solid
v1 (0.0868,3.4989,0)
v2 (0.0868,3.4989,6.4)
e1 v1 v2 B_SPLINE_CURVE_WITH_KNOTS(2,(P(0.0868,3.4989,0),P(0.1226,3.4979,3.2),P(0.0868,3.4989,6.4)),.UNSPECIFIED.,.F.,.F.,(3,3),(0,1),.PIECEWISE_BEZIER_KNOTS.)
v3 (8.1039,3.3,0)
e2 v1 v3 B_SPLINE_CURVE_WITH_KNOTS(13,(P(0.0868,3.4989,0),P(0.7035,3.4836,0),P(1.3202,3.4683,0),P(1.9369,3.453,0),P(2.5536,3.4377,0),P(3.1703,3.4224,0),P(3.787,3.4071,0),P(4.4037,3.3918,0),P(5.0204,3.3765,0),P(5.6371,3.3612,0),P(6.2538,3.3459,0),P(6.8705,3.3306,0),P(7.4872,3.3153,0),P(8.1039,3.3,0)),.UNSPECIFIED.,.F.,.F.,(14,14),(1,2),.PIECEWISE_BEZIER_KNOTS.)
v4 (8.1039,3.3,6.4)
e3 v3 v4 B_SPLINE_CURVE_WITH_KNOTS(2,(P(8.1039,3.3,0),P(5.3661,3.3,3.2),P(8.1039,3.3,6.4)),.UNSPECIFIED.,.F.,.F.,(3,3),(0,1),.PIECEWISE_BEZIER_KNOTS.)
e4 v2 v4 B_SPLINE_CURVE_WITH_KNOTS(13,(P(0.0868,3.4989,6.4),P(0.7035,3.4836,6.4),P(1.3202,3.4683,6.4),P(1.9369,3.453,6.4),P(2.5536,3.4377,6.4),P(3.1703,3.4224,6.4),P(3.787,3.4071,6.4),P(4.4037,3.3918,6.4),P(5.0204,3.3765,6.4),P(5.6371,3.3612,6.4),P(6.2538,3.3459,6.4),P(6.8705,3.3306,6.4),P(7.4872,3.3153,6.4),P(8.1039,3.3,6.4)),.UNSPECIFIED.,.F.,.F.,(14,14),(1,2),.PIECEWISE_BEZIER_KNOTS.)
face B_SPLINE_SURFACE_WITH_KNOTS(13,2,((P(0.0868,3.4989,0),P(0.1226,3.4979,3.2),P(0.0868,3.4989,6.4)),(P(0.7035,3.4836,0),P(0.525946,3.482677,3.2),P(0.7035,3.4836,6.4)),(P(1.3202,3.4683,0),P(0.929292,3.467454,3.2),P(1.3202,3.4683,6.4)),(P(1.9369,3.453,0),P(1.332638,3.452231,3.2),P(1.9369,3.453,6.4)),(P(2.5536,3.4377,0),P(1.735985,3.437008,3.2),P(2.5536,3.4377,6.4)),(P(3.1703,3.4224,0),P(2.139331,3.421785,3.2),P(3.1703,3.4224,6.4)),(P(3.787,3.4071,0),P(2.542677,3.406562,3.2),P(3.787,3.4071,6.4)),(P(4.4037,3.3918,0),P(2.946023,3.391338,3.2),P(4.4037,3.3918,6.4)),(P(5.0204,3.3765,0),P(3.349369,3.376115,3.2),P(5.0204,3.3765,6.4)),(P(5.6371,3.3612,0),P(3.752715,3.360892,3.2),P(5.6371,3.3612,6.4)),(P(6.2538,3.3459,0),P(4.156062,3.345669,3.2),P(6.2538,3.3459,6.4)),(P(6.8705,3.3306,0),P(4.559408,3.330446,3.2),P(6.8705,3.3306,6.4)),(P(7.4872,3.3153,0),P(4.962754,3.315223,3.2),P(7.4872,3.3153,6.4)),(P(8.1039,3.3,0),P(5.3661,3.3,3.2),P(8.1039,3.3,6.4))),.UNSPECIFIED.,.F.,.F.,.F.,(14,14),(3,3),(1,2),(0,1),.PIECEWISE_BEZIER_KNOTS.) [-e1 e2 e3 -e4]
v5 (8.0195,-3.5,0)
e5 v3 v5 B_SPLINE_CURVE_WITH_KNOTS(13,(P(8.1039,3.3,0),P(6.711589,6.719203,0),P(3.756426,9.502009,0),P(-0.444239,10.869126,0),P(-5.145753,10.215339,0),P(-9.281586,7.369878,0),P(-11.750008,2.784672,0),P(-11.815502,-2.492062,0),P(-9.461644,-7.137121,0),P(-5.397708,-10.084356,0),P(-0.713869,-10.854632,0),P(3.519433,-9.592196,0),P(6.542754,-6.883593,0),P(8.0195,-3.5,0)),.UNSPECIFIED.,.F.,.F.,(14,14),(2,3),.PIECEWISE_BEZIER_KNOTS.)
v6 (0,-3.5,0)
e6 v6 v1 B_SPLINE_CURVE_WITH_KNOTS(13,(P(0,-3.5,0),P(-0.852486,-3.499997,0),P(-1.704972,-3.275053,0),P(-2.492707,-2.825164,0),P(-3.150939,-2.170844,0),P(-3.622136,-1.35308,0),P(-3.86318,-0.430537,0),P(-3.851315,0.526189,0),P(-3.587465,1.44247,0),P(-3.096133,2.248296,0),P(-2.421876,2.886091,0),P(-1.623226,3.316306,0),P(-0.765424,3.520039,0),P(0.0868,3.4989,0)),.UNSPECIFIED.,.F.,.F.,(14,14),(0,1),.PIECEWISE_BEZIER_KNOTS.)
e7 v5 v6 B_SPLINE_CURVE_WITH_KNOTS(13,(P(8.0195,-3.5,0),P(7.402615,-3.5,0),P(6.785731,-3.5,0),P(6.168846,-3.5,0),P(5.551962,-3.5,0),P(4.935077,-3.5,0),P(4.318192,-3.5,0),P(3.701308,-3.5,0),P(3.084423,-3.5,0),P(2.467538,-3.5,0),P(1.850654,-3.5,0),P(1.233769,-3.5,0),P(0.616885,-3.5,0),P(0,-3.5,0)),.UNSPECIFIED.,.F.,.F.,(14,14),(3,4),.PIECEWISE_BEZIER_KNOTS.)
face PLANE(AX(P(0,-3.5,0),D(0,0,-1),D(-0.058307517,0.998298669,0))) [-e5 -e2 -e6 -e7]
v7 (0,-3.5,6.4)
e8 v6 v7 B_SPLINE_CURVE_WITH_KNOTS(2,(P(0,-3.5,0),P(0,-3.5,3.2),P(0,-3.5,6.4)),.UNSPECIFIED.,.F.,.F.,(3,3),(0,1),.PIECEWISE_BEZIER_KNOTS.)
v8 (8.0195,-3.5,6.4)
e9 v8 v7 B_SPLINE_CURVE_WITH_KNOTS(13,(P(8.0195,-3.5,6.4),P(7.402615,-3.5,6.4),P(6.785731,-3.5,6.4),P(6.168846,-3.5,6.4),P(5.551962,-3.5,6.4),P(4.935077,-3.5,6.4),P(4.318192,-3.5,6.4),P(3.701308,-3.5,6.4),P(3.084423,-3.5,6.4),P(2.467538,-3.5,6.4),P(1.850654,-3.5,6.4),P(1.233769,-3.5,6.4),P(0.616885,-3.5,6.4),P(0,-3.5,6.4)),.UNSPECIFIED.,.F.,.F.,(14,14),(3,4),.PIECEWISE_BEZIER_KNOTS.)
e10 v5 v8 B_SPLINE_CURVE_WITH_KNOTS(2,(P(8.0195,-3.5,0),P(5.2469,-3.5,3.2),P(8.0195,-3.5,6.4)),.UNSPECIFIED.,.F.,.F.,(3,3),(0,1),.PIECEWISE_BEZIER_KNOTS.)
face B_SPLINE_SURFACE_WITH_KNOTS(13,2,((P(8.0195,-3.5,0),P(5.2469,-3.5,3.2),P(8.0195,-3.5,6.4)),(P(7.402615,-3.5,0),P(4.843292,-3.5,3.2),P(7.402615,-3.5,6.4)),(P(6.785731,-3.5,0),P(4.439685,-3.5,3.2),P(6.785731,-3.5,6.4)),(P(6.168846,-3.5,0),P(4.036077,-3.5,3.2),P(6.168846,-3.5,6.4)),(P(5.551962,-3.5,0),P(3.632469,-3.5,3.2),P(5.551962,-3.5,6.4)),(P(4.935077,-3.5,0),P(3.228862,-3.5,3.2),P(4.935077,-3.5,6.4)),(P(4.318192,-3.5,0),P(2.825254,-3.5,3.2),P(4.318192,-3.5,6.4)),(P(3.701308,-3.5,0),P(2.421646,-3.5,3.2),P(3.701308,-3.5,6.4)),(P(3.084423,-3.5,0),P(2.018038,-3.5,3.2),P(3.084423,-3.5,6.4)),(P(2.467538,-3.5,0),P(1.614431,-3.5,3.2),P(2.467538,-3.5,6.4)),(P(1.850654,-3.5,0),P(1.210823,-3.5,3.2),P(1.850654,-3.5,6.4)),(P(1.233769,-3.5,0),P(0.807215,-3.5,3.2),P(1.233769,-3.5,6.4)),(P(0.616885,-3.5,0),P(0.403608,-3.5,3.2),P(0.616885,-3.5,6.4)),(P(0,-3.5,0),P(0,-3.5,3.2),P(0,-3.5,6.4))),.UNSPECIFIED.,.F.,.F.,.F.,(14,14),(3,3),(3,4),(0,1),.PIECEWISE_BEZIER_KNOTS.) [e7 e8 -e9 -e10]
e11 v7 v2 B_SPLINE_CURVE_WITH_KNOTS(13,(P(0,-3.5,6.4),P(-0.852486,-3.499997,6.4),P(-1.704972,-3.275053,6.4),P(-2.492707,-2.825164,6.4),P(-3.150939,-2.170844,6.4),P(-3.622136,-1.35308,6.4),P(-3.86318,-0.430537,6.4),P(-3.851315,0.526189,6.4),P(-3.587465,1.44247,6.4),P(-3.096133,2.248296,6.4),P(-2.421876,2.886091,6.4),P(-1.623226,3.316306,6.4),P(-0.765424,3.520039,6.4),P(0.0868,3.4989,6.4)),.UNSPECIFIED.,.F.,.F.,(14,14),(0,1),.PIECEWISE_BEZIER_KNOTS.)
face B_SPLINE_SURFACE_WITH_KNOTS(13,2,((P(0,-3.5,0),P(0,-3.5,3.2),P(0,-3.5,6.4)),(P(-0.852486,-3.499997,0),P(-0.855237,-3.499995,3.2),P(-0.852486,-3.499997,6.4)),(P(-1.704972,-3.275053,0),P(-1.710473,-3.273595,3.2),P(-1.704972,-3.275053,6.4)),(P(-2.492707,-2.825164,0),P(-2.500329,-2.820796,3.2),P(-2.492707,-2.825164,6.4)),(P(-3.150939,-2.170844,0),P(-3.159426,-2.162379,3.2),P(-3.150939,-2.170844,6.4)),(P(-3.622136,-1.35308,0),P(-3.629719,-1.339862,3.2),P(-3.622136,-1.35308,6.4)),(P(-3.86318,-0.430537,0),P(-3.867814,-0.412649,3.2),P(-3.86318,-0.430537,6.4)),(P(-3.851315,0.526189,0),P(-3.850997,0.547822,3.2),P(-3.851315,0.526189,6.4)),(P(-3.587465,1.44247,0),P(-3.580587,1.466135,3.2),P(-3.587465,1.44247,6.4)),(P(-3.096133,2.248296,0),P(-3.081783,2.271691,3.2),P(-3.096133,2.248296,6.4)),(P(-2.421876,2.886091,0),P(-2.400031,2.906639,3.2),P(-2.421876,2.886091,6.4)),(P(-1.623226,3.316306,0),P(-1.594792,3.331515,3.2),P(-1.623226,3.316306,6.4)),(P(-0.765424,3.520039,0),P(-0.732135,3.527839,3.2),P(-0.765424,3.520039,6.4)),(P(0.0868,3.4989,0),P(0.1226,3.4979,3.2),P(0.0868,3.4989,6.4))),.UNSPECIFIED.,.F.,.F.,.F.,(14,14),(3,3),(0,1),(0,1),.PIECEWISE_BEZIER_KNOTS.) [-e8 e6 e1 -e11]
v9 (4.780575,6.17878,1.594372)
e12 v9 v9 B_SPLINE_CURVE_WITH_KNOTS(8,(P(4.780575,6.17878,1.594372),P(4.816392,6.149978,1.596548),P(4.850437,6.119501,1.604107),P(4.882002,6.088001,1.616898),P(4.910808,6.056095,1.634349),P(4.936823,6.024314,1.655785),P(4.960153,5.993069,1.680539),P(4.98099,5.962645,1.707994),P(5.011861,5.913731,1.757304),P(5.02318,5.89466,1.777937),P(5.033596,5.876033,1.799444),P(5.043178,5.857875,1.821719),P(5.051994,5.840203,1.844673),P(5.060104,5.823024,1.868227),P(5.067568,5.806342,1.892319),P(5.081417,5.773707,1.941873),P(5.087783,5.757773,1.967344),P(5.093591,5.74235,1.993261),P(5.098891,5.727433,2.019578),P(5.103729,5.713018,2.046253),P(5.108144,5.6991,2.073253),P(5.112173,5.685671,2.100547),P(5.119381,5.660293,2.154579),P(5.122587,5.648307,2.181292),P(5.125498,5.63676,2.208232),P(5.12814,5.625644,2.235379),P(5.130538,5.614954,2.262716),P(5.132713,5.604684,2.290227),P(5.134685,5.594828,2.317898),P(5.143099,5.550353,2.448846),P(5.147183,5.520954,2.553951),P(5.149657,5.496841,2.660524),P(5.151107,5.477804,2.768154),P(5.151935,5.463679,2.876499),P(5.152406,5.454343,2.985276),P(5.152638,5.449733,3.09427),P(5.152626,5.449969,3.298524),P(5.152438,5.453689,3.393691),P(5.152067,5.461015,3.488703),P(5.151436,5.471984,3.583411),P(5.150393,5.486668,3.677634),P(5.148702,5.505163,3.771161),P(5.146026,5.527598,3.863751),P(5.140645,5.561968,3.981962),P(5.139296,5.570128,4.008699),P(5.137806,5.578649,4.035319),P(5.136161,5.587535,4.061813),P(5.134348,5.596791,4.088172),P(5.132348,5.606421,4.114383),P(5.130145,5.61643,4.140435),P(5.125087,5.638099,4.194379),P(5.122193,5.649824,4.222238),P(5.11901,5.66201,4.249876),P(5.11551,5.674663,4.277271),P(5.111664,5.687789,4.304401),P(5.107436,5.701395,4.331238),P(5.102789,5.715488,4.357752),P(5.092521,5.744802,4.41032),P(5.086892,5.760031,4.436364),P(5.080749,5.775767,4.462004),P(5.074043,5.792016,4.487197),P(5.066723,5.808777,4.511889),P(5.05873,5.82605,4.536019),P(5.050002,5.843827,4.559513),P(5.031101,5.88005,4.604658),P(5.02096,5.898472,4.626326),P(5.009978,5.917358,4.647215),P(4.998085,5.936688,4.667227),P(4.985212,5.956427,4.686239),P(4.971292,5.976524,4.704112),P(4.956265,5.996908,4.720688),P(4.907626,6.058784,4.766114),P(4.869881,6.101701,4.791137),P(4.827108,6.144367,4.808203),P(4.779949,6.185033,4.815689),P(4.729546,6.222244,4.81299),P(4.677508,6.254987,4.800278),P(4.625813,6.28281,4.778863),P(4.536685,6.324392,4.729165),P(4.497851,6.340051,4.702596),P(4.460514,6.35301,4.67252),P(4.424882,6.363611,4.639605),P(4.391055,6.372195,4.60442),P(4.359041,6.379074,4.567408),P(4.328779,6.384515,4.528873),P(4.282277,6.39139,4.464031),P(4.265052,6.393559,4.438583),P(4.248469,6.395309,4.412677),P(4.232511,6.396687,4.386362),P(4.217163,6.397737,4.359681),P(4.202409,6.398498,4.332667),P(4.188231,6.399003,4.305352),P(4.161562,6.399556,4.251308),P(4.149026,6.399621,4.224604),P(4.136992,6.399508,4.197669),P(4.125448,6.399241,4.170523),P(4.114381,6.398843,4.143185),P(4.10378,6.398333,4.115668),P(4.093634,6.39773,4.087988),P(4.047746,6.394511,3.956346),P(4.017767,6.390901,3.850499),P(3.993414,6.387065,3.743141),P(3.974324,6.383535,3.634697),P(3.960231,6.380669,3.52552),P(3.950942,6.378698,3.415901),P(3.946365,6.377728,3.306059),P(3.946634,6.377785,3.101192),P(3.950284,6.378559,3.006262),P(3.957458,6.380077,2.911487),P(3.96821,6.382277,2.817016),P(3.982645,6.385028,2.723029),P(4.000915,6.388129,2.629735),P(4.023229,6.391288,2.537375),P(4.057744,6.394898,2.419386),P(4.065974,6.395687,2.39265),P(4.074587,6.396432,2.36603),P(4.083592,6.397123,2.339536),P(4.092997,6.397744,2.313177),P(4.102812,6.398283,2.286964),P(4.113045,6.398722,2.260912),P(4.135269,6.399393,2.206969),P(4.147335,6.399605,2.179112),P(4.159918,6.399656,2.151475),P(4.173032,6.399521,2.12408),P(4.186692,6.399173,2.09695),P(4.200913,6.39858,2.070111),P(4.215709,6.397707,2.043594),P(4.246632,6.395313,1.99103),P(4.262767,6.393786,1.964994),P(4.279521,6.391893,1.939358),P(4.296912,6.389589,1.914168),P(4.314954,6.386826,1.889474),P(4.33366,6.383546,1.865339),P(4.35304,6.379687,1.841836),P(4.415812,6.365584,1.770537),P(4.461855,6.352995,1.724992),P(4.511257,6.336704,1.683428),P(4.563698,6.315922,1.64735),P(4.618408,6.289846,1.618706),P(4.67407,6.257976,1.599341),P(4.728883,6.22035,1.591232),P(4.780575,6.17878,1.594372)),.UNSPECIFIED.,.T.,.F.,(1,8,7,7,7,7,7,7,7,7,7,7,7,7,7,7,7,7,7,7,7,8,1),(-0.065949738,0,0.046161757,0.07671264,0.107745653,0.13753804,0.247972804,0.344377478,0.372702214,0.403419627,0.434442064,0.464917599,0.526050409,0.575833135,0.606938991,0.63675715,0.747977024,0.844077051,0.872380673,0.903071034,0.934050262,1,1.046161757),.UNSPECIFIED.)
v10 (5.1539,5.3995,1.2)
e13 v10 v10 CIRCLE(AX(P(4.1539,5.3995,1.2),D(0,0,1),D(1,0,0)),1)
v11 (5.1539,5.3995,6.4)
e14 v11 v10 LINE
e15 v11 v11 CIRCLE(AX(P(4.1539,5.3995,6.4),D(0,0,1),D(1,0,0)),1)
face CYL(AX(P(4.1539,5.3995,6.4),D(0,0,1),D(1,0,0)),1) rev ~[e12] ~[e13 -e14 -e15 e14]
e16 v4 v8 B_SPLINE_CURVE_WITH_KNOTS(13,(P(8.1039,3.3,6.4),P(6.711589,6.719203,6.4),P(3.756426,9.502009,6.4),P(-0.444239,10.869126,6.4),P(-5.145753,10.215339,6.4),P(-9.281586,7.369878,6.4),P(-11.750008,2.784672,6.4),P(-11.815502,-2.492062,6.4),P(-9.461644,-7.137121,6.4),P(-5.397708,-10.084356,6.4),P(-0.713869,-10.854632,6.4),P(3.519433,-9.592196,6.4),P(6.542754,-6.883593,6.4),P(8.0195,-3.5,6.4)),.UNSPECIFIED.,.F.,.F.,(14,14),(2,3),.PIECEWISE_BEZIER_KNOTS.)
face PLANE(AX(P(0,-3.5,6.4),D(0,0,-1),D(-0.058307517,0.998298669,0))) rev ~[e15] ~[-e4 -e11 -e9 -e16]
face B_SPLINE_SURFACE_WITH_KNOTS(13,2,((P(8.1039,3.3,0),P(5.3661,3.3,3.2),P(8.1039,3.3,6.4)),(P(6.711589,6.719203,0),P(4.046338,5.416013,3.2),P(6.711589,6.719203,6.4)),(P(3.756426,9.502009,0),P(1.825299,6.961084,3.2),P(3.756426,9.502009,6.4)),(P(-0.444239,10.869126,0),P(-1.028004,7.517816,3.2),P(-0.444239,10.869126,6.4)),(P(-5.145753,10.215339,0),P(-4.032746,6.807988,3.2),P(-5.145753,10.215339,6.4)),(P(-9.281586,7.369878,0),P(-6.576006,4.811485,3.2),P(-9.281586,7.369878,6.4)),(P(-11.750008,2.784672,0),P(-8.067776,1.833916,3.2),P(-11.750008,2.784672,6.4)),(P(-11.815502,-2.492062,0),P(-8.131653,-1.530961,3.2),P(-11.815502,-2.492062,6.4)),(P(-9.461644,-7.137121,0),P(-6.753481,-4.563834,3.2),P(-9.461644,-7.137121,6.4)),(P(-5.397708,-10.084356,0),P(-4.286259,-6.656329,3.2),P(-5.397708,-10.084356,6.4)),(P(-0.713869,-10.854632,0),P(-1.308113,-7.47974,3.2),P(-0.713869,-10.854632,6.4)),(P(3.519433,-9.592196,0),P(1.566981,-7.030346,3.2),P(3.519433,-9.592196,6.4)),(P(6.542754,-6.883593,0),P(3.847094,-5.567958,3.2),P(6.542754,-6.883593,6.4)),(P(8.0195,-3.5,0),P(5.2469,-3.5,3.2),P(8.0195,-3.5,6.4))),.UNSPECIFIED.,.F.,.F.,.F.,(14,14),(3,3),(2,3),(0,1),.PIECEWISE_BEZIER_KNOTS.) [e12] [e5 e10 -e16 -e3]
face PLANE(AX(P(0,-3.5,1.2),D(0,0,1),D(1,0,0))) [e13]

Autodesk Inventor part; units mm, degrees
ref_plane "YZ Plane" through (0, 0, 0) normal (1, 0, 0) x (0, 1, 0)
ref_plane "XZ Plane" through (0, 0, 0) normal (0, 1, 0) x (-1, 0, 0)
sketch "Sketch1" plane through (0, 0, 0) normal (0, 0, 1) x (1, 0, 0)
  arc A0 (0.0868, 3.4989) -> (0, -3.5) centre (0, 0) ccw
  arc A1 (8.1039, 3.3) -> (8.0195, -3.5) centre (0, 0) ccw
  line L0 (0.0868, 3.4989) -> (8.1039, 3.3)
  line L1 (0, -3.5) -> (8.0195, -3.5)
  dimension "d0" = 7
  dimension "d1" = 17.5
  dimension "d2" = 3.3
ref_plane "Work Plane1" through (0, 0, 3.2) normal (0, 0, 1) x (1, 0, 0)
sketch "Sketch2" plane through (0, 0, 3.2) normal (0, 0, 1) x (1, 0, 0)
  arc A0 (6.735, 3.3) -> (6.6332, -3.5) centre (0, 0) ccw
  arc A1 (0.1047, 3.4984) -> (0, -3.5) centre (0, 0) ccw
  line L0 (0.1047, 3.4984) -> (6.735, 3.3)
  line L1 (0, -3.5) -> (6.6332, -3.5)
  dimension "d4" = 15
  dimension "d5" = 7
  dimension "d6" = 3.3
ref_plane "Work Plane2" through (0, 0, 6.4) normal (0, 0, 1) x (1, 0, 0)
sketch "Sketch3" plane through (0, 0, 6.4) normal (0, 0, 1) x (1, 0, 0)
  arc A0 (8.1039, 3.3) -> (8.0195, -3.5) centre (0, 0) ccw
  arc A1 (0.0868, 3.4989) -> (0, -3.5) centre (0, 0) ccw
  line L0 (0.0868, 3.4989) -> (8.1039, 3.3)
  line L1 (0, -3.5) -> (8.0195, -3.5)
  dimension "d8" = 17.5
  dimension "d9" = 7
  dimension "d10" = 3.3
loft "Loft1" add profiles "Sketch1", "Sketch2", "Sketch3"
sketch "Sketch4" plane through (0, -3.5, 6.4) normal (0, 0, 1) x (1, 0, 0)
  circle A0 centre (4.1539, 8.8995) radius 1
  line L0 (8.1039, 6.8) -> (0.0868, 6.9989) projected
  point P0 (0, 3.5)
  point P1 (4.0953, 6.8995)
  dimension "d17" = 2
  dimension "d18" = 2
  dimension "d19" = 3.95
extrude "Extrusion1" cut sketch "Sketch4" against normal blind 5.2
properties part number "sg90_shaft_support_v2"
